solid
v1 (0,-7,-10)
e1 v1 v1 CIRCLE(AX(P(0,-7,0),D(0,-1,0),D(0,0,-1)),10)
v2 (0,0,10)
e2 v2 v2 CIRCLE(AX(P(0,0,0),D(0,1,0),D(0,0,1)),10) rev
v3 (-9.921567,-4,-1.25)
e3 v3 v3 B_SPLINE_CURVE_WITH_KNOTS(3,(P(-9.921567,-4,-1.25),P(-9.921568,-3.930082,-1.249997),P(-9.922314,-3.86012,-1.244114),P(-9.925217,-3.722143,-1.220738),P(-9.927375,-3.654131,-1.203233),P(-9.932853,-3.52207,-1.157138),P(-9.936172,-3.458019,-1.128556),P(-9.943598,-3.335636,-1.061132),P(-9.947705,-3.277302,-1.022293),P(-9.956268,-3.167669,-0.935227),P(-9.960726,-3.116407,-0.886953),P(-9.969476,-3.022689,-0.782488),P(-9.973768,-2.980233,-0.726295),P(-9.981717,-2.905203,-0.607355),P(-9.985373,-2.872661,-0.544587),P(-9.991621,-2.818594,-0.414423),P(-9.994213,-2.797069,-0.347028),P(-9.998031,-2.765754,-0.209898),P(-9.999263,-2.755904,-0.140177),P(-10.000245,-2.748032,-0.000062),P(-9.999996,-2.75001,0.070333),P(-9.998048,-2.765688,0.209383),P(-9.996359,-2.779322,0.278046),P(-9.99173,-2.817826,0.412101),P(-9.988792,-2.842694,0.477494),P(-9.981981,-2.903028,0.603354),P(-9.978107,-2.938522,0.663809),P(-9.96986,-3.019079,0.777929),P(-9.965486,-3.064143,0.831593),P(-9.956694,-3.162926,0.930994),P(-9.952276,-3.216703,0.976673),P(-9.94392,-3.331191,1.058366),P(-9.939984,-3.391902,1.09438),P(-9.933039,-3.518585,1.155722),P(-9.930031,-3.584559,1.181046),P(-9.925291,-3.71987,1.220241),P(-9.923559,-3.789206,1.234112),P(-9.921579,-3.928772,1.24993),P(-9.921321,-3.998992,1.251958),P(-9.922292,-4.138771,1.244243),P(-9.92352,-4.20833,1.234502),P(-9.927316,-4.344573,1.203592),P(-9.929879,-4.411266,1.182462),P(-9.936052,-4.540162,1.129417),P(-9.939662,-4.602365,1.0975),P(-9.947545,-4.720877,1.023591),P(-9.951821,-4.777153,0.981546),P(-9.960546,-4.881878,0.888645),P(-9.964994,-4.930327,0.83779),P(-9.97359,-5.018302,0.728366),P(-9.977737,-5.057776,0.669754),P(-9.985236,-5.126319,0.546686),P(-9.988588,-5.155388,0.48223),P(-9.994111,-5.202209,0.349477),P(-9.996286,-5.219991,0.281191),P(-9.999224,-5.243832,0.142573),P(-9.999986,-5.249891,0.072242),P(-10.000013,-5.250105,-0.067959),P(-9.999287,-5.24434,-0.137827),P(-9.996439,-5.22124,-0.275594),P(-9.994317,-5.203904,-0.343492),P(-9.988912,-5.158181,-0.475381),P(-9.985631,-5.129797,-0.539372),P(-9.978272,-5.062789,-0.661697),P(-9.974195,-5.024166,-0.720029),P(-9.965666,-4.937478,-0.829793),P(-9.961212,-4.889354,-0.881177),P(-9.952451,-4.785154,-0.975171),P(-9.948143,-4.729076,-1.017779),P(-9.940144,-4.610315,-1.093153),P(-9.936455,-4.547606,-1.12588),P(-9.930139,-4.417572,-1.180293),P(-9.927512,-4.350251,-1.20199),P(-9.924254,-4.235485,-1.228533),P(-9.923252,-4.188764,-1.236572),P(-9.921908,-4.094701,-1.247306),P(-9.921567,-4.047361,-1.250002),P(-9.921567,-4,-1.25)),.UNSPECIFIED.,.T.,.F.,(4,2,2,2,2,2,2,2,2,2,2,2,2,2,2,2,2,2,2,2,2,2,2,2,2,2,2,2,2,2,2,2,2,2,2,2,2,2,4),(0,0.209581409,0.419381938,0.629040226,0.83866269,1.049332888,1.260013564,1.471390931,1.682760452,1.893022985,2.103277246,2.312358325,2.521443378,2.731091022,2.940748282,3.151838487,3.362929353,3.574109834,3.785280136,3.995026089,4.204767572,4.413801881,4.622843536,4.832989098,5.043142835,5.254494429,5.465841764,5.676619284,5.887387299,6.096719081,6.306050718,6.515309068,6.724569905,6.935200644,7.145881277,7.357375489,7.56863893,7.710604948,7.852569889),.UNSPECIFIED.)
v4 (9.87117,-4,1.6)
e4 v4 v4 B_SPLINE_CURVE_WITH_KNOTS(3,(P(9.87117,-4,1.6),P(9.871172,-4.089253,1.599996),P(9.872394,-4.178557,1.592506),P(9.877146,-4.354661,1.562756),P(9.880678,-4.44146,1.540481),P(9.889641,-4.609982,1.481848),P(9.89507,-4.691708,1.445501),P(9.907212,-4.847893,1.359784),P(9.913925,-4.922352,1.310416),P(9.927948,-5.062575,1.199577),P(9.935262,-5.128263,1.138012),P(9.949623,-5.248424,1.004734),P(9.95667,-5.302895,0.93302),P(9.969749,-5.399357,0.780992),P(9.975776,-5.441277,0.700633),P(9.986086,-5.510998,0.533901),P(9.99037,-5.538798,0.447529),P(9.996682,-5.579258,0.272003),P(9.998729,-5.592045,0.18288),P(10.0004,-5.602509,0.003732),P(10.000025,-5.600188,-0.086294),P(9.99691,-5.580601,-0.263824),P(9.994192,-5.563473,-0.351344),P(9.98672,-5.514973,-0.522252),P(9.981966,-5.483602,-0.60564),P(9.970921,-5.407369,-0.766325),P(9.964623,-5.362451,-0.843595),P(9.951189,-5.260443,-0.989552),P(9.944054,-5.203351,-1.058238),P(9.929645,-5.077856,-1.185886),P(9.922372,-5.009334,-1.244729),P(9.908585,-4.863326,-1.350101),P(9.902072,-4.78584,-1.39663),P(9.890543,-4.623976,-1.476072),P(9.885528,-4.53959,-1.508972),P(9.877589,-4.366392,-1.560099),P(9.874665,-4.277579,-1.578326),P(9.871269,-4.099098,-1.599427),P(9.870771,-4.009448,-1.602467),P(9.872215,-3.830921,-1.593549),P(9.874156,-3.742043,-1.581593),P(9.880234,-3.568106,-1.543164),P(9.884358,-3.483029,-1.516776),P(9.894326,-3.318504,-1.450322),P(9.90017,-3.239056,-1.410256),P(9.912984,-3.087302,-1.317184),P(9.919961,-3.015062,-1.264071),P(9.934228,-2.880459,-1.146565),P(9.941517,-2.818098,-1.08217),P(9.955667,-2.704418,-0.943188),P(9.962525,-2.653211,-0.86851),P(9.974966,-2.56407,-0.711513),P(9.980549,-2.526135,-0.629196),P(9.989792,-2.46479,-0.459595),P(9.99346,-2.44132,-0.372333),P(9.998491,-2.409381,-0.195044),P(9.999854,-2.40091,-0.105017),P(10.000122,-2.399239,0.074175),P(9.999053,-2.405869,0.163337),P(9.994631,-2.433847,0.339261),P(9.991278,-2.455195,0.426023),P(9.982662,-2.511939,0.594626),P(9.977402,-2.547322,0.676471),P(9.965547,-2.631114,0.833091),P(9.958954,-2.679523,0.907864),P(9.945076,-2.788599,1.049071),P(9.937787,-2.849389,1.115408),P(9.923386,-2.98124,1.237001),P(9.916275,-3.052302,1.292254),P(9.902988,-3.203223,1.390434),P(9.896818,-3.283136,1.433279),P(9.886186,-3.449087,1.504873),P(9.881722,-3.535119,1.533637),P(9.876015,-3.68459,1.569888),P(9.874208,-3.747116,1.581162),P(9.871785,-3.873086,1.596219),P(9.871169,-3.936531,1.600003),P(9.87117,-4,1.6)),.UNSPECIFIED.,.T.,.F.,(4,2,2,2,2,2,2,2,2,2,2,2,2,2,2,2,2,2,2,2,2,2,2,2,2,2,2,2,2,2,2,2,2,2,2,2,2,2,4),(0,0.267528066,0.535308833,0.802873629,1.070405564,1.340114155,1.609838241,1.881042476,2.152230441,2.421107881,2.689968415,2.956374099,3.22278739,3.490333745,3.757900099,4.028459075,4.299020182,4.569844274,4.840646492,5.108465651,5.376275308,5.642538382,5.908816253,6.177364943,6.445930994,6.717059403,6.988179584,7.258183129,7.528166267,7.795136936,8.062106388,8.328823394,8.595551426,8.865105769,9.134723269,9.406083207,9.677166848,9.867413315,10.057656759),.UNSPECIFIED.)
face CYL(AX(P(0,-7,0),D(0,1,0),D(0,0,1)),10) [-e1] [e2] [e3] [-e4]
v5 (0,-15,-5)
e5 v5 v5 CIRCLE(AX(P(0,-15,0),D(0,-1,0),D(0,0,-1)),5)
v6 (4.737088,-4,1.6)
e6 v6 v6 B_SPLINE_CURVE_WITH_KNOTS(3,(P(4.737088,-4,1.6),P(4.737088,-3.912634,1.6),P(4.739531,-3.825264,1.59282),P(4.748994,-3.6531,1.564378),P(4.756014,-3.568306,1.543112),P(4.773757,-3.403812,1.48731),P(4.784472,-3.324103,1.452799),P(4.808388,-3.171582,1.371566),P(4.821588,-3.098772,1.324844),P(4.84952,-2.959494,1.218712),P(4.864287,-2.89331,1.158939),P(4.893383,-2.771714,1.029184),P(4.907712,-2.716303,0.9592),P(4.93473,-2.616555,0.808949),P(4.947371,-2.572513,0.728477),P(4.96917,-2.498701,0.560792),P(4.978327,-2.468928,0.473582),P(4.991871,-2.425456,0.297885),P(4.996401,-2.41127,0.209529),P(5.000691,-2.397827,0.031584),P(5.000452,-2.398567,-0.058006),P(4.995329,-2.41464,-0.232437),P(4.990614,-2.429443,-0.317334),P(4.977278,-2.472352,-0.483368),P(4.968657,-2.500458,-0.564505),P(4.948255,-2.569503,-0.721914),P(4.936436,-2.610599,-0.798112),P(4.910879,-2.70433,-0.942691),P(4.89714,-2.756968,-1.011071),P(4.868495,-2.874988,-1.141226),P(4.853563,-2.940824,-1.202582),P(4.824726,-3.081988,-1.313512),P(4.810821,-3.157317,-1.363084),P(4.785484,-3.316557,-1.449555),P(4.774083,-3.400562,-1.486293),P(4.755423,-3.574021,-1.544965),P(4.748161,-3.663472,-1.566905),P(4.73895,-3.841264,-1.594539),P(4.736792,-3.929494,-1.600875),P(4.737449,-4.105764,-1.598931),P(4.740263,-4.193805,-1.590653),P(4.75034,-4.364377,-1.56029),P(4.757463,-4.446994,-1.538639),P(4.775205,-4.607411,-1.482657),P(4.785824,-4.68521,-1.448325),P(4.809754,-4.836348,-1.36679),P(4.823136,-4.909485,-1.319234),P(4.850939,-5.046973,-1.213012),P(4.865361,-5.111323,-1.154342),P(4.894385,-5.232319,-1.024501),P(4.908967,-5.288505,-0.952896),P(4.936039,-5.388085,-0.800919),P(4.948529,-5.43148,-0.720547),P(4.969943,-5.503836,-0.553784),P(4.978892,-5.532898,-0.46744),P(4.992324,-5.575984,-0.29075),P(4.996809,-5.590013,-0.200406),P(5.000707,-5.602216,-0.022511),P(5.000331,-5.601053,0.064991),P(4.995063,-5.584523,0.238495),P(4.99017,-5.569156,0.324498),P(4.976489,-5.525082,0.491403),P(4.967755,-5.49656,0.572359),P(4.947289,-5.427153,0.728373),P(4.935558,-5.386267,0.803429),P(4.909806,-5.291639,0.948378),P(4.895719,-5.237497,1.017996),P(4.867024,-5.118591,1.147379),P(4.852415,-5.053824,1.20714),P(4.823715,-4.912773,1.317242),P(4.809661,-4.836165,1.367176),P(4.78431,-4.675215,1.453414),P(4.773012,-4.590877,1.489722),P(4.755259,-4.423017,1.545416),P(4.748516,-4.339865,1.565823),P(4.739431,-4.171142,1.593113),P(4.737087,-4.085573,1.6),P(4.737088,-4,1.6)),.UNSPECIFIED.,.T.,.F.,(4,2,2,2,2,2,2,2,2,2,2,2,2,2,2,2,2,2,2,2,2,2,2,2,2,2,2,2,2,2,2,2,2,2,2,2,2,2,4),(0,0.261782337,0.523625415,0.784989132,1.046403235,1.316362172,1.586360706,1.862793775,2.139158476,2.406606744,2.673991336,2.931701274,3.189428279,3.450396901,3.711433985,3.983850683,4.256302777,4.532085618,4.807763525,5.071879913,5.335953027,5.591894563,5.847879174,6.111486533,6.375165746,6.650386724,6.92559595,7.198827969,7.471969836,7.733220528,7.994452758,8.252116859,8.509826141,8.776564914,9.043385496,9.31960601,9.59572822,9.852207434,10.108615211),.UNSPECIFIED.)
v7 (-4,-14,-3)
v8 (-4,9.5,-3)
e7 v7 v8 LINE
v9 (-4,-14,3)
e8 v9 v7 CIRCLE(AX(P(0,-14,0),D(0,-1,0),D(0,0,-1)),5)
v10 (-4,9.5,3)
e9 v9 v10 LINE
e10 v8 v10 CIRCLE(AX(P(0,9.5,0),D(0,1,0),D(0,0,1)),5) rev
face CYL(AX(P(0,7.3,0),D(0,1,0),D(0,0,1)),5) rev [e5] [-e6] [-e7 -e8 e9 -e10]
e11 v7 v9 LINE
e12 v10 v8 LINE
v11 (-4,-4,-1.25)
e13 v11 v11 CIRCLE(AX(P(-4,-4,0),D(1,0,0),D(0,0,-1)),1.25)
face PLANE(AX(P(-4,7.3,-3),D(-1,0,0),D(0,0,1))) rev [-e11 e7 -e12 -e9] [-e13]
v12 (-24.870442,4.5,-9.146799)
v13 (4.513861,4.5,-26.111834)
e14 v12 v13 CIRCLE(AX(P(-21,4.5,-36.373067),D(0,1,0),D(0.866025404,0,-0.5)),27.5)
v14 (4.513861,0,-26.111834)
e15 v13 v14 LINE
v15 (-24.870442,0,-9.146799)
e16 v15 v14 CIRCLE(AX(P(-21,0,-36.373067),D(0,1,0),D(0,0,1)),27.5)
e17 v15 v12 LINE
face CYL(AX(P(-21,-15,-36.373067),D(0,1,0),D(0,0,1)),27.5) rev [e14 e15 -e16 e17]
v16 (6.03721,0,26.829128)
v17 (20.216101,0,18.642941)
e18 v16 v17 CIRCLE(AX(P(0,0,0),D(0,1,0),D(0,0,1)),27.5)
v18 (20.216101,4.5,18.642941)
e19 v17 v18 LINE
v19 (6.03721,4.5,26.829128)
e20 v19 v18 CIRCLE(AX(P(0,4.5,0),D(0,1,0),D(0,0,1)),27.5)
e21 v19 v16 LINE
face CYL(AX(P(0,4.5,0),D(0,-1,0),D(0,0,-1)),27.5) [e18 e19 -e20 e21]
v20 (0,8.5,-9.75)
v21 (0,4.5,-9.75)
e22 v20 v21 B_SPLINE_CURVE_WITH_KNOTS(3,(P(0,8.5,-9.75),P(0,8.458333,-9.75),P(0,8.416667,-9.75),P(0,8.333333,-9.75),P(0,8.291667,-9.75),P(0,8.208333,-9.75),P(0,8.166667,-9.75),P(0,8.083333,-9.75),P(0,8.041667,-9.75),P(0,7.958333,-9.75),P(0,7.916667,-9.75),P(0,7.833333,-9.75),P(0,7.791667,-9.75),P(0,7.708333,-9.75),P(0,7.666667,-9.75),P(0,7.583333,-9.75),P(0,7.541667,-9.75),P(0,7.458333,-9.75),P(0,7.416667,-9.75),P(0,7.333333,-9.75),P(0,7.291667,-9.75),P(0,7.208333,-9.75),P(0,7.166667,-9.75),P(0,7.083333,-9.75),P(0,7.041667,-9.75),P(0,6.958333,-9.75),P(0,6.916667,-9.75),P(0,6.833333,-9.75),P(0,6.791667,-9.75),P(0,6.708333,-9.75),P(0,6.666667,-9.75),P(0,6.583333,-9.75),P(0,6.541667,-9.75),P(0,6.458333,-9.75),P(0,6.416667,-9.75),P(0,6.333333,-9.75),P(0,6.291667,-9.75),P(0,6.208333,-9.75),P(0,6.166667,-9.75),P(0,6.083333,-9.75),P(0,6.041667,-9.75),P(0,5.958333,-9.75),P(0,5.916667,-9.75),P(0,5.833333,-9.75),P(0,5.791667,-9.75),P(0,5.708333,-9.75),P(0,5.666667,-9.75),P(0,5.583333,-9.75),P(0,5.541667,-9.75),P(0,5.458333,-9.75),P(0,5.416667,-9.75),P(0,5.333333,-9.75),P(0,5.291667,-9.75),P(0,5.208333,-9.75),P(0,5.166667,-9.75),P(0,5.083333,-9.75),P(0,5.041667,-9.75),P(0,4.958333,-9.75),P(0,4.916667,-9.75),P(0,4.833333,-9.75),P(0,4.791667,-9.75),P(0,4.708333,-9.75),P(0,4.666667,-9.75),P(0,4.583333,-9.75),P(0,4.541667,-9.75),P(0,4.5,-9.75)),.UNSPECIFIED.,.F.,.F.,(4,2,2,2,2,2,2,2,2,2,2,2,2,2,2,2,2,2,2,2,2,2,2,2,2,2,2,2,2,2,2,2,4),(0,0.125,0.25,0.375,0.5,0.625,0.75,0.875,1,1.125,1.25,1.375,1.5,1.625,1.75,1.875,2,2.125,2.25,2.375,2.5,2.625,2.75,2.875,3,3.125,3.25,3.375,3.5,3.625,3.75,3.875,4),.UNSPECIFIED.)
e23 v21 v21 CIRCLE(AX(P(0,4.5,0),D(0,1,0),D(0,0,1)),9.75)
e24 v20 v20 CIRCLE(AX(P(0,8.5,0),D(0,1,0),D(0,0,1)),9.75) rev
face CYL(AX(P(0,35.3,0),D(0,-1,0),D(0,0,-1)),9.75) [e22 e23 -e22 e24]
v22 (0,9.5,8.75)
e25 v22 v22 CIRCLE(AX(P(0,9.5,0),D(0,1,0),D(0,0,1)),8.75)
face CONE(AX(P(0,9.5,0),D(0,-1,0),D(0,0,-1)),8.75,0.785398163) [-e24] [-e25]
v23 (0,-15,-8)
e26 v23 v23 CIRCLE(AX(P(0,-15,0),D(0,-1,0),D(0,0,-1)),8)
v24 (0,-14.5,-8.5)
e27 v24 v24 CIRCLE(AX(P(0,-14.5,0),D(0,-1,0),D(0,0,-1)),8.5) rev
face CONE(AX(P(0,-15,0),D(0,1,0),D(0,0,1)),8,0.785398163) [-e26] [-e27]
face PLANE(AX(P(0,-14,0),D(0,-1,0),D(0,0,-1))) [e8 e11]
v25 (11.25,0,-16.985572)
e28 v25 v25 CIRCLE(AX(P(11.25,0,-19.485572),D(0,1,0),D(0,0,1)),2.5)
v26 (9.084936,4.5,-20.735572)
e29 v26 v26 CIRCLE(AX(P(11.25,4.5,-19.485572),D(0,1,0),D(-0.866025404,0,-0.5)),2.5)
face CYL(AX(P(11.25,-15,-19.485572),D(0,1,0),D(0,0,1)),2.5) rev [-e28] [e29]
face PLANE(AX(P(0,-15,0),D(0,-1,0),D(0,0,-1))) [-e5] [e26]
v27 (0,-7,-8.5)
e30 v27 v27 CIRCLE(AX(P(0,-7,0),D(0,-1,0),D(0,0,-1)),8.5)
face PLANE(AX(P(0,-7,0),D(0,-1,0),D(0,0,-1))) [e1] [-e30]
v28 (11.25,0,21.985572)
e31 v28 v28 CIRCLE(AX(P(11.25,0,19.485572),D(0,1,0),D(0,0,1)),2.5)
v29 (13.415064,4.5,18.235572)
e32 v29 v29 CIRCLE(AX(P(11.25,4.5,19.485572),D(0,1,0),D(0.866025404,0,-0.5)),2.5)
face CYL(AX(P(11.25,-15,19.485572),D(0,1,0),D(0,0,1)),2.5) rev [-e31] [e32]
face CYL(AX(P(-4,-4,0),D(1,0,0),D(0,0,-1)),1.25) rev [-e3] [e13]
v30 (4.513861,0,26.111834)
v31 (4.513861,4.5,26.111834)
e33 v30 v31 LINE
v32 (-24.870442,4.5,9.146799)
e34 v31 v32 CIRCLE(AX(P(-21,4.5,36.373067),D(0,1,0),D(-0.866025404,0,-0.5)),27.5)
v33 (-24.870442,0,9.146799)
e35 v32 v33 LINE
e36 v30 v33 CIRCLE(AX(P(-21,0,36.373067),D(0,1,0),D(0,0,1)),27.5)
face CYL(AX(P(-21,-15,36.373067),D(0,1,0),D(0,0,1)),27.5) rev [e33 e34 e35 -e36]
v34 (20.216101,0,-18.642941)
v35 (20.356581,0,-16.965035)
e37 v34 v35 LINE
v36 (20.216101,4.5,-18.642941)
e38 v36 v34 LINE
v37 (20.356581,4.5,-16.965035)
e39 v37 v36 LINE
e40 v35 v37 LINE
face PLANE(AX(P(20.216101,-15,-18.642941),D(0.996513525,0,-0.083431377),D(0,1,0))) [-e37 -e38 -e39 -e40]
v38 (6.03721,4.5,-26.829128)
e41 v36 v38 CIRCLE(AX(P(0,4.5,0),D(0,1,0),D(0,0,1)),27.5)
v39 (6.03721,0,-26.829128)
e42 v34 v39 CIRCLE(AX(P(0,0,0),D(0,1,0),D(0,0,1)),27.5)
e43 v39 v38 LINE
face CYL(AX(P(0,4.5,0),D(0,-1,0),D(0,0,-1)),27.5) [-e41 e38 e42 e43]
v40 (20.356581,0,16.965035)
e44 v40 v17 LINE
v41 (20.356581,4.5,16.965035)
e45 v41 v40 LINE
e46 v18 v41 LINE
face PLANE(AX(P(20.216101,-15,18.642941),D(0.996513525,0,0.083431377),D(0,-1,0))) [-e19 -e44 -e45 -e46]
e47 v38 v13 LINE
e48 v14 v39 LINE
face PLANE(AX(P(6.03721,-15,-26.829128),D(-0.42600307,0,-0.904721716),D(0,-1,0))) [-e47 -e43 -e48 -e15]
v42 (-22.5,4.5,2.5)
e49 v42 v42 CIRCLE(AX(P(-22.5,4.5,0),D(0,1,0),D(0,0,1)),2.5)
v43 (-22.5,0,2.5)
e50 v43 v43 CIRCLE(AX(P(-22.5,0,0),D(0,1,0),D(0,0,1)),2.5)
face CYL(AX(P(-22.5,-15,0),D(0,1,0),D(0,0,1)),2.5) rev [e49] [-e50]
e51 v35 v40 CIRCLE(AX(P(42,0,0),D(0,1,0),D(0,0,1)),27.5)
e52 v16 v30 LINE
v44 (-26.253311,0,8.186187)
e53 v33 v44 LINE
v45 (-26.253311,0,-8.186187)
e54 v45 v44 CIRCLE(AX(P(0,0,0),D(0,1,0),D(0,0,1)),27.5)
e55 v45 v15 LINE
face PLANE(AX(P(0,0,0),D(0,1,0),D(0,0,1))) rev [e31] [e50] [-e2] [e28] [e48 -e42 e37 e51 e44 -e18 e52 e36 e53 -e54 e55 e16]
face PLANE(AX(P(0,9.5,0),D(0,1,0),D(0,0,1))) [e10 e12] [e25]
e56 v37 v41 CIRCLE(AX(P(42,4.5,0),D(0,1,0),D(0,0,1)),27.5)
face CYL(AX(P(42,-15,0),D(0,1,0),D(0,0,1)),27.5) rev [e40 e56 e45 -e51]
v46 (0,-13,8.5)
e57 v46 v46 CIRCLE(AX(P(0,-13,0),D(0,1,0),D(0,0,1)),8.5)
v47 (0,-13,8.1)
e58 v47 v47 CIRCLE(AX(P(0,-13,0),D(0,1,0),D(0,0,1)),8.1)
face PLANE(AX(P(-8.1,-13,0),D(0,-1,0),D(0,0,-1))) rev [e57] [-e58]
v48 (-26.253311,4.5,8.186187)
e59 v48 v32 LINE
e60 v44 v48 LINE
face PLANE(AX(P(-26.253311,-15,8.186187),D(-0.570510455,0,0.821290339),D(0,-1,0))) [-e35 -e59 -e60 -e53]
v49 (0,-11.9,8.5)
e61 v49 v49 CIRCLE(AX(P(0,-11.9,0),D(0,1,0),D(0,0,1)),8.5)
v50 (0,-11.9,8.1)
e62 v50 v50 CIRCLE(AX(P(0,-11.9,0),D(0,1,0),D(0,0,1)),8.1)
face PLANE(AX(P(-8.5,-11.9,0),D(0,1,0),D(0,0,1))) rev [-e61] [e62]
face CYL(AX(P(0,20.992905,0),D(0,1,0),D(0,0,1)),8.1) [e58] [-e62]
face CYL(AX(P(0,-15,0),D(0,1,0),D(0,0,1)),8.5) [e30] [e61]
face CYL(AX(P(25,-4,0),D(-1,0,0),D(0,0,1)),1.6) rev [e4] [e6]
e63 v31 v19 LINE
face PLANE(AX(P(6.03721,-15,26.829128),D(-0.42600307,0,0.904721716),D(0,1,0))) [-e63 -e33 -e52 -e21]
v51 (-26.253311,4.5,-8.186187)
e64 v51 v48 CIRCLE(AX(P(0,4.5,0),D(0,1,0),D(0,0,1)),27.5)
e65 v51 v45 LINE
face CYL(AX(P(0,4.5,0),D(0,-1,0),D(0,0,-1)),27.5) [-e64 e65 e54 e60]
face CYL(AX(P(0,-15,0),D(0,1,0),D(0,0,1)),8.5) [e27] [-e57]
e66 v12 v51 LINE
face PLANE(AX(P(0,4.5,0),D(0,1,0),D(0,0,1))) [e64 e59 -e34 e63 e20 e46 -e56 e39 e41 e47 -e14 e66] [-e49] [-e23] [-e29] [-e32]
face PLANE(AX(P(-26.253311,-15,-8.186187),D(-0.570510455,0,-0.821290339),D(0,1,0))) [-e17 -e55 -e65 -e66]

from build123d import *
from build123d.topology import SkipClean

# Parameters (mm, degrees)
SKETCH_1_R               = 27.5
EXTRUDE_1_DEPTH          = 4.5
SKETCH_2_R               = 9.75
EXTRUDE_2_DEPTH          = 30.8
CUT_EXTRUDE_1_DEPTH      = 28
SKETCH_5_R               = 10
EXTRUDE_3_DEPTH          = 7
SKETCH_6_R               = 8.5
EXTRUDE_4_DEPTH          = 8
SKETCH_11_R              = 2.5
CUT_EXTRUDE_3_DEPTH      = 50.609878049
PATTERN_CIRCULAR_1_COUNT = 6
SKETCH_12_R              = 13.008113322
CUT_EXTRUDE_4_DEPTH      = 25.8
CHAMFER_2_SIZE           = 1
SKETCH_13_W              = 0.4
SKETCH_13_H              = 1.1
CHAMFER_3_SIZE           = 0.5
CUT_EXTRUDE_5_DEPTH      = 46.964660338
SKETCH_15_R              = 1.6
CUT_EXTRUDE_6_DEPTH      = 25
HOLE_WIZARD_M3_1_D       = 2.5
SKETCH_18_R              = 27.5
CUT_EXTRUDE_7_DEPTH      = 44.505746792
PATTERN_CIRCULAR_2_COUNT = 3
PATTERN_CIRCULAR_2_ANGLE = 240
SKETCH_19_R              = 5
CUT_EXTRUDE_8_DEPTH      = 1


with BuildPart() as part:
    # 草图1 → 凸台-拉伸1 (new body)
    with BuildSketch(Plane(origin=(0, 0, 0), x_dir=(1, 0, 0), z_dir=(0, 1, 0))):
        with Locations(Location((0, 0, 0), (0, 0, 270))):
            Circle(SKETCH_1_R)
    extrude(amount=EXTRUDE_1_DEPTH)

    # 草图2 → 凸台-拉伸2 (add)
    with BuildSketch(Plane(origin=(0, 4.5, 0), x_dir=(1, 0, 0), z_dir=(0, 1, 0))):
        with Locations(Location((0, 0, 0), (0, 0, 90))):
            Circle(SKETCH_2_R)
    extrude(amount=EXTRUDE_2_DEPTH)

    # 草图4 → 切除-拉伸1 (cut)
    with BuildSketch(Plane(origin=(0, 35.3, 0), x_dir=(1, 0, 0), z_dir=(0, 1, 0))):
        with BuildLine():
            Line((-4, 3), (-4, -3))
            ThreePointArc((-4, -3), (5, 0), (-4, 3))
        make_face()
    extrude(amount=-CUT_EXTRUDE_1_DEPTH, mode=Mode.SUBTRACT)

    # 草图5 → 凸台-拉伸3 (add)
    with BuildSketch(Plane.XZ):
        with Locations(Location((0, 0, 0), (0, 0, 90))):
            Circle(SKETCH_5_R)
    extrude(amount=EXTRUDE_3_DEPTH)

    # 草图6 → 凸台-拉伸4 (add)
    with BuildSketch(Plane.XZ.offset(7)):
        with Locations(Location((0, 0, 0), (0, 0, 270))):
            Circle(SKETCH_6_R)
    extrude(amount=EXTRUDE_4_DEPTH)

    # 草图11 → 切除-拉伸3 (cut, through all)
    with BuildSketch(Plane(origin=(0, 4.5, 0), x_dir=(1, 0, 0), z_dir=(0, 1, 0))):
        with Locations(Location((-22.5, 0, 0), (0, 0, 270))):
            Circle(SKETCH_11_R)
    cut_extrude_3 = extrude(amount=-CUT_EXTRUDE_3_DEPTH, mode=Mode.SUBTRACT)

    # 阵列(圆周)1: 切除-拉伸3 ×6 about axis
    pattern_circular_1_axis = Axis((0, 0, 0), (0, 1, 0))
    for i in range(1, PATTERN_CIRCULAR_1_COUNT):
        add(cut_extrude_3.rotate(pattern_circular_1_axis, i * 360 / PATTERN_CIRCULAR_1_COUNT), mode=Mode.SUBTRACT)

    # 草图12 → 切除-拉伸4 (cut)
    with BuildSketch(Plane(origin=(0, 35.3, 0), x_dir=(1, 0, 0), z_dir=(0, 1, 0))):
        Circle(SKETCH_12_R)
    extrude(amount=-CUT_EXTRUDE_4_DEPTH, mode=Mode.SUBTRACT)

    # 倒角2
    chamfer_2_edges = [part.edges().sort_by_distance(p)[0] for p in [
        (0, 9.5, 9.75),
    ]]
    chamfer(chamfer_2_edges, length=CHAMFER_2_SIZE)

    # 草图13 → 切除-旋转1 (revolve, cut)
    with BuildSketch(Plane.XY, mode=Mode.PRIVATE) as cut_revolve_1_sk:
        with Locations((-8.3, -12.45)):
            Rectangle(SKETCH_13_W, SKETCH_13_H)
    revolve(cut_revolve_1_sk.sketch.rotate(Axis((0, 20.99290486, 0), (0, -1, 0)), 270), axis=Axis((0, 20.99290486, 0), (0, -1, 0)), mode=Mode.SUBTRACT)

    # 倒角3
    chamfer_3_edges = [part.edges().sort_by_distance(p)[0] for p in [
        (0, -15, 8.5),
    ]]
    chamfer(chamfer_3_edges, length=CHAMFER_3_SIZE)

    # 草图14 → 切除-拉伸5 (cut, through all)
    with BuildSketch(Plane.XZ.offset(15)):
        with BuildLine():
            Line((-4, -3), (-4, 3))
            ThreePointArc((-4, 3), (5, 0), (-4, -3))
        make_face()
    extrude(amount=-CUT_EXTRUDE_5_DEPTH, mode=Mode.SUBTRACT)

    # 草图15 → 切除-拉伸6 (cut)
    with BuildSketch(Plane(origin=(0, 0, 0), x_dir=(0, 0, -1), z_dir=(1, 0, 0))):
        with Locations(Location((0, -4, 0), (0, 0, 180))):
            Circle(SKETCH_15_R)
    extrude(amount=CUT_EXTRUDE_6_DEPTH, mode=Mode.SUBTRACT)

    # M3 螺纹孔1 (through all)
    with Locations(Plane(origin=(-4, 0, 0), x_dir=(0, 0, -1), z_dir=(1, 0, 0))):
        with Locations((0, -4)):
            Hole(HOLE_WIZARD_M3_1_D / 2)

    # 草图18 → 切除-拉伸7 (cut, through all)
    with BuildSketch(Plane(origin=(0, 4.5, 0), x_dir=(1, 0, 0), z_dir=(0, 1, 0))):
        with Locations((42, 0)):
            Circle(SKETCH_18_R)
    cut_extrude_7 = extrude(amount=-CUT_EXTRUDE_7_DEPTH, mode=Mode.SUBTRACT)

    # 阵列(圆周)2: 切除-拉伸7 ×3 about axis
    pattern_circular_2_axis = Axis((0, 0, 0), (0, 1, 0))
    for i in range(1, PATTERN_CIRCULAR_2_COUNT):
        add(cut_extrude_7.rotate(pattern_circular_2_axis, i * PATTERN_CIRCULAR_2_ANGLE / (PATTERN_CIRCULAR_2_COUNT - 1)), mode=Mode.SUBTRACT)

    # 倒角4
    # the kernel refuses this chamfer: 1.21981355, 1 mm, written as the material it takes off along each edge
    with BuildSketch(Plane(origin=(21, 7.559330204, 17.755280905), x_dir=(-0.6313868632849613, 0, -0.7754680063491838), z_dir=(0, -1, 0)), Plane(origin=(4.876524315, 7.559330204, -27.064173932), x_dir=(-0.3558815616779696, 0, 0.9345310663951465), z_dir=(0, -1, 0)), Plane(origin=(-25.876524315, 7.559330204, 9.308893027), x_dir=(0.9872684249629431, 0, -0.15906306004597578), z_dir=(0, -1, 0))) as chamfer_4_piece_1:
        with BuildLine():
            Line((1.019056312, 0), (-0.193408604, -1.168344991))
            ThreePointArc((-0.193408604, -1.168344991), (-0.106182465, -0.602433867), (0, 0))
            ThreePointArc((0, 0), (0.527109428, -0.00471513), (1.019056312, 0))
        make_face()
    extrude(amount=10.618660408, mode=Mode.SUBTRACT)
    with BuildSketch(Plane(origin=(21, 7.559330204, -17.755280905), x_dir=(-0.6313868632849639, 0, 0.7754680063491817), z_dir=(0, -1, 0))) as chamfer_4_piece_2:
        with BuildLine():
            Line((1.019056312, 0), (-0.193408604, 1.168344991))
            ThreePointArc((-0.193408604, 1.168344991), (-0.106182465, 0.602433867), (0, 0))
            ThreePointArc((0, 0), (0.527109428, 0.00471513), (1.019056312, 0))
        make_face()
    extrude(amount=10.618660408, mode=Mode.SUBTRACT)
    with BuildSketch(Plane(origin=(-25.876524315, 7.559330204, -9.308893027), x_dir=(-0.31816612737533284, 0, 0.9480349758268328), z_dir=(0, -1, 0)), Plane(origin=(4.876524315, 7.559330204, 27.064173932), x_dir=(0.9801054364298685, 0, -0.1984775389826691), z_dir=(0, -1, 0))) as chamfer_4_piece_3:
        with BuildLine():
            Line((1.18424529, 0), (-0.166430267, -1.005373928))
            ThreePointArc((-0.166430267, -1.005373928), (-0.08143465, -0.520802246), (0, 0))
            ThreePointArc((0, 0), (0.611686784, 0.006368493), (1.18424529, 0))
        make_face()
    extrude(amount=10.618660408, mode=Mode.SUBTRACT)

    # 草图19 → 切除-拉伸8 (cut)
    with SkipClean():  # the faces are left unmerged after this step: merging them gives an invalid solid
        with BuildSketch(Plane.XZ.offset(15)):
            with Locations(Location((0, 0, 0), (0, 0, 143.130102354))):
                Circle(SKETCH_19_R)
        extrude(amount=-CUT_EXTRUDE_8_DEPTH, mode=Mode.SUBTRACT)


solid = part.part
